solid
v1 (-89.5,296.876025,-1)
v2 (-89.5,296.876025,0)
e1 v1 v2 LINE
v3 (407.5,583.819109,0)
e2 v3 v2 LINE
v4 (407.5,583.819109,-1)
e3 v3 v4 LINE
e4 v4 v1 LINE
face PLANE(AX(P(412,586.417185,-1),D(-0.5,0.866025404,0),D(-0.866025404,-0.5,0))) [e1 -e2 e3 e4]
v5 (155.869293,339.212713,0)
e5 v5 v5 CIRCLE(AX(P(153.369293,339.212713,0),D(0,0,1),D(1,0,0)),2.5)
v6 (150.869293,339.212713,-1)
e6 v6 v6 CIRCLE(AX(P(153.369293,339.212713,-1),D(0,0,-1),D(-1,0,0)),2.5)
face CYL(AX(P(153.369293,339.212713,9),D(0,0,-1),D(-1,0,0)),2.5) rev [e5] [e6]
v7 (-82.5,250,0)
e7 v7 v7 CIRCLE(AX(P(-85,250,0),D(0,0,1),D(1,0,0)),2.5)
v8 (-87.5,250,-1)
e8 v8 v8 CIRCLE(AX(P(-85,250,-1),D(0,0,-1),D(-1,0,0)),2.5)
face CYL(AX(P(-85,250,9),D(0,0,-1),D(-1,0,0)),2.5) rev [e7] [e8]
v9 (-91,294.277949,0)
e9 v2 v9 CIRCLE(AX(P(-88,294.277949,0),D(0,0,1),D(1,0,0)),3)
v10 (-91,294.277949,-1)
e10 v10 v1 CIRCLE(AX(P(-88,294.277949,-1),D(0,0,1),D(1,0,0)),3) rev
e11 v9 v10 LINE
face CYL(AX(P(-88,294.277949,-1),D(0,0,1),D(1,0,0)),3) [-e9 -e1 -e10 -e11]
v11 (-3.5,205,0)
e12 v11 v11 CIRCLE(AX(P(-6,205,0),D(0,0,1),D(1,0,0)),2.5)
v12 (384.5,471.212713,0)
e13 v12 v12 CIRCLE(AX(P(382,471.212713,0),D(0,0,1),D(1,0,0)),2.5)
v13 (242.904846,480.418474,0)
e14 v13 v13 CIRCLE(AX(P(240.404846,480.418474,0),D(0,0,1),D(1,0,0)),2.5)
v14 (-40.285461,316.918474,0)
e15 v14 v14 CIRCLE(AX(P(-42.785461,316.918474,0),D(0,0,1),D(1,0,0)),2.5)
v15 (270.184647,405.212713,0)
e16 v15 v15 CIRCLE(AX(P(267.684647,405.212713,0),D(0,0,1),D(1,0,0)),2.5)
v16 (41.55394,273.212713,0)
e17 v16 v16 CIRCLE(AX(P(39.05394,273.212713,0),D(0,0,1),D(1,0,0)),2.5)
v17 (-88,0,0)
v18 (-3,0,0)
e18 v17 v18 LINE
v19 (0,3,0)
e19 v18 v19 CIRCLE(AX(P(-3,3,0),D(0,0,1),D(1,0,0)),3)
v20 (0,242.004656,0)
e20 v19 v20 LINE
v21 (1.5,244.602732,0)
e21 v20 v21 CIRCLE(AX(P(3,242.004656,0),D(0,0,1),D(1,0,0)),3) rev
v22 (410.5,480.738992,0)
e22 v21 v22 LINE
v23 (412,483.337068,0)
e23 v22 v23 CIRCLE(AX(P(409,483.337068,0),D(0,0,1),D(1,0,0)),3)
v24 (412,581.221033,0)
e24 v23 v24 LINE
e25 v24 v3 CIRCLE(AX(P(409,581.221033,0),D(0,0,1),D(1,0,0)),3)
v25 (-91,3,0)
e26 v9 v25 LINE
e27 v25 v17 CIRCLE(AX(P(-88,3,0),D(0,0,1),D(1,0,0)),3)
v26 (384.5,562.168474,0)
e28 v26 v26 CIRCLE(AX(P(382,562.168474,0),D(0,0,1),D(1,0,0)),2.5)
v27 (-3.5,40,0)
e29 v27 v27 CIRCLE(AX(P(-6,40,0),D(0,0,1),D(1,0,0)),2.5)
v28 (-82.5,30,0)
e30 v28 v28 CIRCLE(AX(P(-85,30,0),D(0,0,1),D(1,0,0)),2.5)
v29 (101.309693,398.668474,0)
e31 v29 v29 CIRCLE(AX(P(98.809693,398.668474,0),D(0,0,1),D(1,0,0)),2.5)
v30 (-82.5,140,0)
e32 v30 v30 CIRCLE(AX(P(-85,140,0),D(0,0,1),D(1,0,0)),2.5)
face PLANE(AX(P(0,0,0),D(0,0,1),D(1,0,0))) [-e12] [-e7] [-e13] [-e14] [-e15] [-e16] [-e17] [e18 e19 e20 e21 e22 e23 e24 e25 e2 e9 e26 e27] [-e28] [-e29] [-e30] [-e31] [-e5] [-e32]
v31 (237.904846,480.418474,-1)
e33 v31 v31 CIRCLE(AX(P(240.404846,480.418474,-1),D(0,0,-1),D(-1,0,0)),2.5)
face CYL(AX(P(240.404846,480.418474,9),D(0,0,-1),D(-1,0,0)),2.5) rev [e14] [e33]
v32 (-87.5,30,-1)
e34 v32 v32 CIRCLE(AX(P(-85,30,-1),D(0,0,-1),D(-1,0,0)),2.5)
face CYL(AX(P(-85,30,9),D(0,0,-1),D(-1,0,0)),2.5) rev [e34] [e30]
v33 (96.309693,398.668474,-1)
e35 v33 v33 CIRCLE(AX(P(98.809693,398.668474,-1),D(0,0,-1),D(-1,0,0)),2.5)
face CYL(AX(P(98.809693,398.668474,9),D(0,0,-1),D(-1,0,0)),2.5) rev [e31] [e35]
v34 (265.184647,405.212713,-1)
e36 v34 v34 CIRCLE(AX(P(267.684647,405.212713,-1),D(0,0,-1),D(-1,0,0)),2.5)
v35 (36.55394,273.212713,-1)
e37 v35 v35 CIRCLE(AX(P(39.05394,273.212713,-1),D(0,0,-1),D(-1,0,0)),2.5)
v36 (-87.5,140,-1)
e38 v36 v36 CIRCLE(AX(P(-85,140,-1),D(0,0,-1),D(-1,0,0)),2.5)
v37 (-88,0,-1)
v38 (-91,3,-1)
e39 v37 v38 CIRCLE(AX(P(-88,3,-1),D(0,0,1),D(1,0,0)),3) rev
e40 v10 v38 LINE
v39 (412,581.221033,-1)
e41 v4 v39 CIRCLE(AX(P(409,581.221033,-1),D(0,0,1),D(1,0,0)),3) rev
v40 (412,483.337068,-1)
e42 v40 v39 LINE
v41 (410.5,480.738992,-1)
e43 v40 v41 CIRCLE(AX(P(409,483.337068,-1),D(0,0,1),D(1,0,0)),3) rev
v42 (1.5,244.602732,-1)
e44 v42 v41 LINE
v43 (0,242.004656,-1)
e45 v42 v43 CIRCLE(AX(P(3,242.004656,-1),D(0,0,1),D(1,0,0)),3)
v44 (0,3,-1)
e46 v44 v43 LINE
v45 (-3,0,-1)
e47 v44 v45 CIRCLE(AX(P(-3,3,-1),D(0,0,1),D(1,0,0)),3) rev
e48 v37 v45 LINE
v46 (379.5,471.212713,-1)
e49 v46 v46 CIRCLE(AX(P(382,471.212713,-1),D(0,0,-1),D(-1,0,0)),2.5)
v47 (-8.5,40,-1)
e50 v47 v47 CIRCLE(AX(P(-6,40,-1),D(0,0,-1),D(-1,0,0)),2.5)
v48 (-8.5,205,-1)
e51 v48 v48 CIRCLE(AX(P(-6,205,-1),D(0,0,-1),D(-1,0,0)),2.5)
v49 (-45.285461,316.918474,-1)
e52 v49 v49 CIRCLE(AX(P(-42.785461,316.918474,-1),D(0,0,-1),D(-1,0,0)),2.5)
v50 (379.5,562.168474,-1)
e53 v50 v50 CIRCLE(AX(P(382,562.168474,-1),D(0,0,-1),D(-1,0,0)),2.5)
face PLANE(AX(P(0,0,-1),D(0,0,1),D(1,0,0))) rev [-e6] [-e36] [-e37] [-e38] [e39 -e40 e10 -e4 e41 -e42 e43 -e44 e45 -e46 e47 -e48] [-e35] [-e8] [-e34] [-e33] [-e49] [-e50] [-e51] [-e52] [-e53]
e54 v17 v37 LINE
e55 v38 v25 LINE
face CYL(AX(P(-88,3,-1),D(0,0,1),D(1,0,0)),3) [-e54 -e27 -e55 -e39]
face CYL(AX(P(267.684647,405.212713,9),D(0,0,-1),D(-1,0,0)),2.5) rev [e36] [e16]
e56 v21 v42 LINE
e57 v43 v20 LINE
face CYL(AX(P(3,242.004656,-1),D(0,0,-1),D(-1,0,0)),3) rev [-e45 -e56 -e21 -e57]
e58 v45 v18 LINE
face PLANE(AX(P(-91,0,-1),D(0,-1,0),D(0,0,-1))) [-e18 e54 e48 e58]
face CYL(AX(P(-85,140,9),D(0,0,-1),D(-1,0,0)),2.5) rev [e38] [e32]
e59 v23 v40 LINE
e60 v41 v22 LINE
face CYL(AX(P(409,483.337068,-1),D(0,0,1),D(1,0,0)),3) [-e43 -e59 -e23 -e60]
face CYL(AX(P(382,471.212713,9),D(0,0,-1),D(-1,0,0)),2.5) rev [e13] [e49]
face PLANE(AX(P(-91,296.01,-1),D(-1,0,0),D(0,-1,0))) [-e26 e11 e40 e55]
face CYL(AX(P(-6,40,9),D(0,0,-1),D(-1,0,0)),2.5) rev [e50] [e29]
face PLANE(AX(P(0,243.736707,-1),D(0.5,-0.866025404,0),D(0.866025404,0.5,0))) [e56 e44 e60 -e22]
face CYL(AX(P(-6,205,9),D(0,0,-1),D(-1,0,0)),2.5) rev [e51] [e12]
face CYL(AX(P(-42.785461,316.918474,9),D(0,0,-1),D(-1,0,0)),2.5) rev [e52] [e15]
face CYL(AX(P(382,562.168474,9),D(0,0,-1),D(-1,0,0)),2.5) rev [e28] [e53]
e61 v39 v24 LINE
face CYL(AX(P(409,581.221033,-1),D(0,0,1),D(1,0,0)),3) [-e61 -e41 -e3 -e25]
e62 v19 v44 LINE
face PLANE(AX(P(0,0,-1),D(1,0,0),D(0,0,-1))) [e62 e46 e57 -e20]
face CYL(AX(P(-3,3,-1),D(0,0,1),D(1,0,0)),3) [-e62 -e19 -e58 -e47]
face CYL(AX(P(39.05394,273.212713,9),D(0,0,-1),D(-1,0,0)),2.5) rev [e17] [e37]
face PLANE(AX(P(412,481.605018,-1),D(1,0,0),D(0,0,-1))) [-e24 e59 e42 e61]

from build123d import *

# Parameters (mm, degrees)
BASE_FLANGE1_DEPTH = 1
FILLET1_R          = 3
SKETCH2_R          = 2.5
CUT_EXTRUDE1_DEPTH = 10


# Sheet-metal steps are written as plain solids
with BuildPart() as part:
    # Sketch1 → Base-Flange1 (new body)
    with BuildSketch(Plane.XY):
        Polygon((0, 0), (0, 243.736706628), (412, 481.605017534), (412, 586.417185402), (-91, 296.01), (-91, 0), align=None)
    extrude(amount=-BASE_FLANGE1_DEPTH)

    # Fillet1
    fillet1_edges = [part.edges().sort_by_distance(p)[0] for p in [
        (-91, 0, -0.5),
        (-91, 296.01, -0.5),
        (412, 586.417185402, -0.5),
        (412, 481.605017534, -0.5),
        (0, 243.736706628, -0.5),
        (0, 0, -0.5),
    ]]
    fillet(fillet1_edges, radius=FILLET1_R)

    # Sketch2 → Cut-Extrude1 (cut)
    with BuildSketch(Plane(origin=(0, 0, -1), x_dir=(-1, 0, 0), z_dir=(0, 0, -1))):
        with Locations((-382, 562.168474096)):
            Circle(SKETCH2_R)
        with Locations((-240.404846481, 480.418474096)):
            Circle(SKETCH2_R)
        with Locations((-98.809692962, 398.668474096)):
            Circle(SKETCH2_R)
        with Locations((42.785460556, 316.918474096)):
            Circle(SKETCH2_R)
        with Locations((-382, 471.212712688)):
            Circle(SKETCH2_R)
        with Locations((-267.6846467, 405.212712688)):
            Circle(SKETCH2_R)
        with Locations((-153.369293401, 339.212712688)):
            Circle(SKETCH2_R)
        with Locations((-39.053940101, 273.212712688)):
            Circle(SKETCH2_R)
        with Locations((85, 30)):
            Circle(SKETCH2_R)
        with Locations((6, 40)):
            Circle(SKETCH2_R)
        with Locations((85, 140)):
            Circle(SKETCH2_R)
        with Locations((85, 250)):
            Circle(SKETCH2_R)
        with Locations((6, 205)):
            Circle(SKETCH2_R)
    extrude(amount=-CUT_EXTRUDE1_DEPTH, mode=Mode.SUBTRACT)


solid = part.part
